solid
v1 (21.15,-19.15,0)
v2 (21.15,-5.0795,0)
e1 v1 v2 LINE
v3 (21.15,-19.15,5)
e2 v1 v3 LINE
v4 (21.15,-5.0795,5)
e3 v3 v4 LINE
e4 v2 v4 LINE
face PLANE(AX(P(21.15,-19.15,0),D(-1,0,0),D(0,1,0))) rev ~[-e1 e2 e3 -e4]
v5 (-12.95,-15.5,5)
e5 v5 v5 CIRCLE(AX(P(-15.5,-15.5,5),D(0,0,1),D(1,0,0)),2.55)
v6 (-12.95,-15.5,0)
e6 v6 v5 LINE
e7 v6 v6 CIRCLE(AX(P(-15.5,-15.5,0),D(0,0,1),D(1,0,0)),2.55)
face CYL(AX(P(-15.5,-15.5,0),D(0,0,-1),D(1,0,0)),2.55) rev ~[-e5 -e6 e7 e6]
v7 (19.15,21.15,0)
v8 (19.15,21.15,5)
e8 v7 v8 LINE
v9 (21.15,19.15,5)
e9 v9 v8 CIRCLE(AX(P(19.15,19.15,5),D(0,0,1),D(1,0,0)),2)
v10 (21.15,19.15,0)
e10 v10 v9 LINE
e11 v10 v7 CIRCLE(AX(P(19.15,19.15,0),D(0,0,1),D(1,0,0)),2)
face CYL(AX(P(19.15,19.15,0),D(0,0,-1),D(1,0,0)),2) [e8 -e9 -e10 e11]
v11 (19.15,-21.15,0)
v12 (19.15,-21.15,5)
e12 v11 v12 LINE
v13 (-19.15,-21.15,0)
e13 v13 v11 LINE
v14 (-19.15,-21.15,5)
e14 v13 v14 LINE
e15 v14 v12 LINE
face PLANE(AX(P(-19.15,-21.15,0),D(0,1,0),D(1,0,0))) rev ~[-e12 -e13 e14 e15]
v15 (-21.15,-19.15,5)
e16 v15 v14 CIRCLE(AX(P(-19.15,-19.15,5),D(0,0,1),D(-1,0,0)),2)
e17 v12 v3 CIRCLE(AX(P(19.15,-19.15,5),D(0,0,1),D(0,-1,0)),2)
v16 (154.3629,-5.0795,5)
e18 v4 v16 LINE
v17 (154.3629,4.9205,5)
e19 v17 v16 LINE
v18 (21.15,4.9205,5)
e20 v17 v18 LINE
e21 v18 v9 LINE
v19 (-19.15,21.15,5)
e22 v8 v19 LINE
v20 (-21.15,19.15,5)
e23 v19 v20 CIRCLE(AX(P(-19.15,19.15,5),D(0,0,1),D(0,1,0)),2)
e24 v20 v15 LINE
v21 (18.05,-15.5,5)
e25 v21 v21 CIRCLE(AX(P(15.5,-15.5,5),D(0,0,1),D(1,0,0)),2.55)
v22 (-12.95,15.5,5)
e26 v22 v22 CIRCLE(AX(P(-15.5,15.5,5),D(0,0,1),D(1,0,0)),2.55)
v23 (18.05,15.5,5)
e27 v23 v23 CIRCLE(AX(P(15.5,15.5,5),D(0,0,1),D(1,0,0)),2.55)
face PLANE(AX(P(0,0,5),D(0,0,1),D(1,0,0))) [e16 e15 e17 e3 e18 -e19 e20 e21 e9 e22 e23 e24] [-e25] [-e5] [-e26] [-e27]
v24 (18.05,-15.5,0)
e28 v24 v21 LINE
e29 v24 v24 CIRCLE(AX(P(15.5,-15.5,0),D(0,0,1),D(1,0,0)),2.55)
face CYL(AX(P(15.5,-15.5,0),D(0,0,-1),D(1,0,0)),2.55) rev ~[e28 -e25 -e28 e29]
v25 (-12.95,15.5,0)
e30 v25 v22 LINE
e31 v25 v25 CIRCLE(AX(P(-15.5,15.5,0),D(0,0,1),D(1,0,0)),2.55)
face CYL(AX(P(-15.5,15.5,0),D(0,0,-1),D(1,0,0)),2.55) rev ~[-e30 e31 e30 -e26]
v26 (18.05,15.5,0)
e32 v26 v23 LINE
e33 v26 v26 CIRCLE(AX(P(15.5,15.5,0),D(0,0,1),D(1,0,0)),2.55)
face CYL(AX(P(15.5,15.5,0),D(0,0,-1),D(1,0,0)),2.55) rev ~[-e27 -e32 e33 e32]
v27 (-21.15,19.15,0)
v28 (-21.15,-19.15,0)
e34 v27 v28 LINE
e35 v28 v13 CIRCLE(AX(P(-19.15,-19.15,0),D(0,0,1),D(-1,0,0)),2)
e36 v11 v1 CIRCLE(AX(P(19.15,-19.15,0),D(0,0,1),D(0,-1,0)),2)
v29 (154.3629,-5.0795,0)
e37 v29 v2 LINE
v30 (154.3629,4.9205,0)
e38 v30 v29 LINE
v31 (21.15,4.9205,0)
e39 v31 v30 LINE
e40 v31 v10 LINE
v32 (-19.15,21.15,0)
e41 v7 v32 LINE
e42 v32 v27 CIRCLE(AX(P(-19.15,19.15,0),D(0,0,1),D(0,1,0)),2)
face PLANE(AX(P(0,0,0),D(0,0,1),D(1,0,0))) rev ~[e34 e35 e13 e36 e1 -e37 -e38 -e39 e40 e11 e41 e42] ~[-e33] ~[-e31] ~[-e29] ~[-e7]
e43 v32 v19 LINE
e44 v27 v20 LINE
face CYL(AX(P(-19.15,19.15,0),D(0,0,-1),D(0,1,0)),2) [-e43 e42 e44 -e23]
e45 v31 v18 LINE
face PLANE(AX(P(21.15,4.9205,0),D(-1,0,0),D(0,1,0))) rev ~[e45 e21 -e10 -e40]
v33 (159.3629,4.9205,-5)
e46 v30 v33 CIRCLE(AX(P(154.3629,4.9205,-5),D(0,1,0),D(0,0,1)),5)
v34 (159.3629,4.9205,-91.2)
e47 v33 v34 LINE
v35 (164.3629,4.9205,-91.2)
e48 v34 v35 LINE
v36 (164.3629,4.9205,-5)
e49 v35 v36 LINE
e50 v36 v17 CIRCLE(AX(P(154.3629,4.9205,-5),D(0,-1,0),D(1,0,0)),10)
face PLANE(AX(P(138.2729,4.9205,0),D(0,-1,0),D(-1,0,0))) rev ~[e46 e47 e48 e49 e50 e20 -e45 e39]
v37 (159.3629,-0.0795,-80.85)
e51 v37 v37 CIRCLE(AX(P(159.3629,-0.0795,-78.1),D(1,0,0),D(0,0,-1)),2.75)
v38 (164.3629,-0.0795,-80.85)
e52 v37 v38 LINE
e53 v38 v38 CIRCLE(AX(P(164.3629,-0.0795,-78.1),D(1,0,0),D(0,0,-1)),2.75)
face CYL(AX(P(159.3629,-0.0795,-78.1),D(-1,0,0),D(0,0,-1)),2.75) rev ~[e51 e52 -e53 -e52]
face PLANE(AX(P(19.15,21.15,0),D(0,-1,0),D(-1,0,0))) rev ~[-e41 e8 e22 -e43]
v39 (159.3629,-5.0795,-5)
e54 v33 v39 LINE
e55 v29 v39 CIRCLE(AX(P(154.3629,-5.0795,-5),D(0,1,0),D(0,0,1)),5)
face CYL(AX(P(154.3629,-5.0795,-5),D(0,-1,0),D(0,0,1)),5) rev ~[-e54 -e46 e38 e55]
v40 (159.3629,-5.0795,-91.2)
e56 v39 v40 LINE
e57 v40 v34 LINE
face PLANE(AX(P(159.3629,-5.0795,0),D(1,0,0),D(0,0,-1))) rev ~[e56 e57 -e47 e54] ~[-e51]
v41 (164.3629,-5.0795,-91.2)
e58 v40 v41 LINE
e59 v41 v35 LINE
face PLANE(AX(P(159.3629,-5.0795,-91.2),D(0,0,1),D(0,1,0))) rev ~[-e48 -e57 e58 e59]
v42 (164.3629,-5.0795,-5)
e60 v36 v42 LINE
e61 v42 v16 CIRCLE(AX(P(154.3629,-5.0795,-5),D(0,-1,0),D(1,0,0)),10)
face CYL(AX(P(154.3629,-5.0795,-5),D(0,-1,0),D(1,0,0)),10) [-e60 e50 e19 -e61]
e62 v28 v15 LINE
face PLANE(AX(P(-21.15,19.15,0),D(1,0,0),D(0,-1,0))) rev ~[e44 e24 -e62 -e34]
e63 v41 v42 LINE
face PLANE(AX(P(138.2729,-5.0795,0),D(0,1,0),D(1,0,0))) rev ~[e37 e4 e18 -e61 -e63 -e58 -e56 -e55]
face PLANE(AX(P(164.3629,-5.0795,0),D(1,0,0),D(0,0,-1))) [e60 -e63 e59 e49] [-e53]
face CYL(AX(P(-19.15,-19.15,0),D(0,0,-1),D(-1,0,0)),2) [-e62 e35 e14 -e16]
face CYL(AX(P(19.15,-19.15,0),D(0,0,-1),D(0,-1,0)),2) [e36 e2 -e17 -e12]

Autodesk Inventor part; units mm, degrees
ref_plane "YZ Plane" through (0, 0, 0) normal (1, 0, 0) x (0, 1, 0)
ref_plane "XZ Plane" through (0, 0, 0) normal (0, 1, 0) x (-1, 0, 0)
ref_plane "XY Plane" through (0, 0, 0) normal (0, 0, 1) x (1, 0, 0)
sketch "Sketch1" plane through (0, 0, 0) normal (0, 0, 1) x (1, 0, 0)
  line L0 (-21.15, 19.15) -> (-21.15, -19.15)
  line L1 (21.15, -19.15) -> (21.15, 19.15)
  line L2 (19.15, 21.15) -> (-19.15, 21.15)
  line L3 (-19.15, -21.15) -> (19.15, -21.15)
  line L4 (159.3629, -5.0795) -> (159.3629, 4.9205)
  line L5 (159.3629, -5.0795) -> (159.3629, 4.9205)
  line L6 (159.3629, 4.9205) -> (138.2729, 4.9205)
  line L7 (138.2729, -5.0795) -> (159.3629, -5.0795)
  circle A0 centre (-15.5, -15.5) radius 2.55
  circle A1 centre (15.5, 15.5) radius 2.55
  circle A2 centre (-15.5, 15.5) radius 2.55
  circle A3 centre (15.5, -15.5) radius 2.55
  line L8 (-21.15, -19.15) -> (-21.15, 19.15)
  line L9 (-19.15, 21.15) -> (19.15, 21.15)
  line L10 (21.15, 19.15) -> (21.15, -19.15)
  line L11 (19.15, -21.15) -> (-19.15, -21.15)
  arc A4 (-21.15, -19.15) -> (-19.15, -21.15) centre (-19.15, -19.15) ccw
  arc A5 (-19.15, 21.15) -> (-21.15, 19.15) centre (-19.15, 19.15) ccw
  arc A6 (21.15, 19.15) -> (19.15, 21.15) centre (19.15, 19.15) ccw
  arc A7 (19.15, -21.15) -> (21.15, -19.15) centre (19.15, -19.15) ccw
  circle A8 centre (-15.5, -15.5) radius 2.55
  circle A9 centre (-15.5, 15.5) radius 2.55
  circle A10 centre (15.5, 15.5) radius 2.55
  circle A11 centre (15.5, -15.5) radius 2.55
  line L12 (159.3629, -5.0795) -> (21.15, -5.0795)
  line L13 (159.3629, -5.0795) -> (159.3629, 4.9205)
  line L14 (159.3629, 4.9205) -> (21.15, 4.9205)
  point P0 (0, 0)
  dimension "d0" = 2
sketch "Sketch2" plane through (159.3629, -5.0795, 0) normal (1, 0, 0) x (0, 0, -1)
  line L0 (91.2, 0) -> (91.2, 10)
  line L1 (65, 0) -> (65, 10)
  circle A0 centre (78.1, 5) radius 2.75
  line L2 (-5, 10) -> (-5, 0)
  line L3 (0, 10) -> (-5, 10)
  line L4 (0, 0) -> (-5, 0)
  line L5 (-5, 10) -> (91.2, 10)
  line L6 (91.2, 10) -> (91.2, 0)
  line L7 (91.2, 0) -> (-5, 0)
  line L8 (-5, 0) -> (-5, 10)
  circle A1 centre (78.1, 5) radius 2.75
  point P0 (0, 5.0795)
extrude "Plate1" add sketch "Sketch1" along normal blind 5
sheet face with bend "Face2" sketch "Sketch2" thickness 5 toward (1, 0, 0) bend radius 5
bend "Bend1"
equation "\"d1\" = Thickness"
equation "\"d2\" = BendRadius"
equation "\"d3\" = BendReliefWidth"
equation "\"d5\" = MinimumRemnant"
equation "\"d4\" = BendReliefDepth"
equation "\"d6\" = TransitionRadius"
equation "\"BendRadius\" = Thickness"
equation "\"BendReliefWidth\" = Thickness"
equation "\"BendReliefDepth\" = 0.5 * Thickness"
equation "\"TransitionRadius\" = BendRadius"
equation "\"JacobiRadiusSize\" = BendRadius"
equation "\"GapSize\" = Thickness"
equation "\"Thickness\" = 5"
equation "\"MinimumRemnant\" = 10"
properties part number "corredera"
